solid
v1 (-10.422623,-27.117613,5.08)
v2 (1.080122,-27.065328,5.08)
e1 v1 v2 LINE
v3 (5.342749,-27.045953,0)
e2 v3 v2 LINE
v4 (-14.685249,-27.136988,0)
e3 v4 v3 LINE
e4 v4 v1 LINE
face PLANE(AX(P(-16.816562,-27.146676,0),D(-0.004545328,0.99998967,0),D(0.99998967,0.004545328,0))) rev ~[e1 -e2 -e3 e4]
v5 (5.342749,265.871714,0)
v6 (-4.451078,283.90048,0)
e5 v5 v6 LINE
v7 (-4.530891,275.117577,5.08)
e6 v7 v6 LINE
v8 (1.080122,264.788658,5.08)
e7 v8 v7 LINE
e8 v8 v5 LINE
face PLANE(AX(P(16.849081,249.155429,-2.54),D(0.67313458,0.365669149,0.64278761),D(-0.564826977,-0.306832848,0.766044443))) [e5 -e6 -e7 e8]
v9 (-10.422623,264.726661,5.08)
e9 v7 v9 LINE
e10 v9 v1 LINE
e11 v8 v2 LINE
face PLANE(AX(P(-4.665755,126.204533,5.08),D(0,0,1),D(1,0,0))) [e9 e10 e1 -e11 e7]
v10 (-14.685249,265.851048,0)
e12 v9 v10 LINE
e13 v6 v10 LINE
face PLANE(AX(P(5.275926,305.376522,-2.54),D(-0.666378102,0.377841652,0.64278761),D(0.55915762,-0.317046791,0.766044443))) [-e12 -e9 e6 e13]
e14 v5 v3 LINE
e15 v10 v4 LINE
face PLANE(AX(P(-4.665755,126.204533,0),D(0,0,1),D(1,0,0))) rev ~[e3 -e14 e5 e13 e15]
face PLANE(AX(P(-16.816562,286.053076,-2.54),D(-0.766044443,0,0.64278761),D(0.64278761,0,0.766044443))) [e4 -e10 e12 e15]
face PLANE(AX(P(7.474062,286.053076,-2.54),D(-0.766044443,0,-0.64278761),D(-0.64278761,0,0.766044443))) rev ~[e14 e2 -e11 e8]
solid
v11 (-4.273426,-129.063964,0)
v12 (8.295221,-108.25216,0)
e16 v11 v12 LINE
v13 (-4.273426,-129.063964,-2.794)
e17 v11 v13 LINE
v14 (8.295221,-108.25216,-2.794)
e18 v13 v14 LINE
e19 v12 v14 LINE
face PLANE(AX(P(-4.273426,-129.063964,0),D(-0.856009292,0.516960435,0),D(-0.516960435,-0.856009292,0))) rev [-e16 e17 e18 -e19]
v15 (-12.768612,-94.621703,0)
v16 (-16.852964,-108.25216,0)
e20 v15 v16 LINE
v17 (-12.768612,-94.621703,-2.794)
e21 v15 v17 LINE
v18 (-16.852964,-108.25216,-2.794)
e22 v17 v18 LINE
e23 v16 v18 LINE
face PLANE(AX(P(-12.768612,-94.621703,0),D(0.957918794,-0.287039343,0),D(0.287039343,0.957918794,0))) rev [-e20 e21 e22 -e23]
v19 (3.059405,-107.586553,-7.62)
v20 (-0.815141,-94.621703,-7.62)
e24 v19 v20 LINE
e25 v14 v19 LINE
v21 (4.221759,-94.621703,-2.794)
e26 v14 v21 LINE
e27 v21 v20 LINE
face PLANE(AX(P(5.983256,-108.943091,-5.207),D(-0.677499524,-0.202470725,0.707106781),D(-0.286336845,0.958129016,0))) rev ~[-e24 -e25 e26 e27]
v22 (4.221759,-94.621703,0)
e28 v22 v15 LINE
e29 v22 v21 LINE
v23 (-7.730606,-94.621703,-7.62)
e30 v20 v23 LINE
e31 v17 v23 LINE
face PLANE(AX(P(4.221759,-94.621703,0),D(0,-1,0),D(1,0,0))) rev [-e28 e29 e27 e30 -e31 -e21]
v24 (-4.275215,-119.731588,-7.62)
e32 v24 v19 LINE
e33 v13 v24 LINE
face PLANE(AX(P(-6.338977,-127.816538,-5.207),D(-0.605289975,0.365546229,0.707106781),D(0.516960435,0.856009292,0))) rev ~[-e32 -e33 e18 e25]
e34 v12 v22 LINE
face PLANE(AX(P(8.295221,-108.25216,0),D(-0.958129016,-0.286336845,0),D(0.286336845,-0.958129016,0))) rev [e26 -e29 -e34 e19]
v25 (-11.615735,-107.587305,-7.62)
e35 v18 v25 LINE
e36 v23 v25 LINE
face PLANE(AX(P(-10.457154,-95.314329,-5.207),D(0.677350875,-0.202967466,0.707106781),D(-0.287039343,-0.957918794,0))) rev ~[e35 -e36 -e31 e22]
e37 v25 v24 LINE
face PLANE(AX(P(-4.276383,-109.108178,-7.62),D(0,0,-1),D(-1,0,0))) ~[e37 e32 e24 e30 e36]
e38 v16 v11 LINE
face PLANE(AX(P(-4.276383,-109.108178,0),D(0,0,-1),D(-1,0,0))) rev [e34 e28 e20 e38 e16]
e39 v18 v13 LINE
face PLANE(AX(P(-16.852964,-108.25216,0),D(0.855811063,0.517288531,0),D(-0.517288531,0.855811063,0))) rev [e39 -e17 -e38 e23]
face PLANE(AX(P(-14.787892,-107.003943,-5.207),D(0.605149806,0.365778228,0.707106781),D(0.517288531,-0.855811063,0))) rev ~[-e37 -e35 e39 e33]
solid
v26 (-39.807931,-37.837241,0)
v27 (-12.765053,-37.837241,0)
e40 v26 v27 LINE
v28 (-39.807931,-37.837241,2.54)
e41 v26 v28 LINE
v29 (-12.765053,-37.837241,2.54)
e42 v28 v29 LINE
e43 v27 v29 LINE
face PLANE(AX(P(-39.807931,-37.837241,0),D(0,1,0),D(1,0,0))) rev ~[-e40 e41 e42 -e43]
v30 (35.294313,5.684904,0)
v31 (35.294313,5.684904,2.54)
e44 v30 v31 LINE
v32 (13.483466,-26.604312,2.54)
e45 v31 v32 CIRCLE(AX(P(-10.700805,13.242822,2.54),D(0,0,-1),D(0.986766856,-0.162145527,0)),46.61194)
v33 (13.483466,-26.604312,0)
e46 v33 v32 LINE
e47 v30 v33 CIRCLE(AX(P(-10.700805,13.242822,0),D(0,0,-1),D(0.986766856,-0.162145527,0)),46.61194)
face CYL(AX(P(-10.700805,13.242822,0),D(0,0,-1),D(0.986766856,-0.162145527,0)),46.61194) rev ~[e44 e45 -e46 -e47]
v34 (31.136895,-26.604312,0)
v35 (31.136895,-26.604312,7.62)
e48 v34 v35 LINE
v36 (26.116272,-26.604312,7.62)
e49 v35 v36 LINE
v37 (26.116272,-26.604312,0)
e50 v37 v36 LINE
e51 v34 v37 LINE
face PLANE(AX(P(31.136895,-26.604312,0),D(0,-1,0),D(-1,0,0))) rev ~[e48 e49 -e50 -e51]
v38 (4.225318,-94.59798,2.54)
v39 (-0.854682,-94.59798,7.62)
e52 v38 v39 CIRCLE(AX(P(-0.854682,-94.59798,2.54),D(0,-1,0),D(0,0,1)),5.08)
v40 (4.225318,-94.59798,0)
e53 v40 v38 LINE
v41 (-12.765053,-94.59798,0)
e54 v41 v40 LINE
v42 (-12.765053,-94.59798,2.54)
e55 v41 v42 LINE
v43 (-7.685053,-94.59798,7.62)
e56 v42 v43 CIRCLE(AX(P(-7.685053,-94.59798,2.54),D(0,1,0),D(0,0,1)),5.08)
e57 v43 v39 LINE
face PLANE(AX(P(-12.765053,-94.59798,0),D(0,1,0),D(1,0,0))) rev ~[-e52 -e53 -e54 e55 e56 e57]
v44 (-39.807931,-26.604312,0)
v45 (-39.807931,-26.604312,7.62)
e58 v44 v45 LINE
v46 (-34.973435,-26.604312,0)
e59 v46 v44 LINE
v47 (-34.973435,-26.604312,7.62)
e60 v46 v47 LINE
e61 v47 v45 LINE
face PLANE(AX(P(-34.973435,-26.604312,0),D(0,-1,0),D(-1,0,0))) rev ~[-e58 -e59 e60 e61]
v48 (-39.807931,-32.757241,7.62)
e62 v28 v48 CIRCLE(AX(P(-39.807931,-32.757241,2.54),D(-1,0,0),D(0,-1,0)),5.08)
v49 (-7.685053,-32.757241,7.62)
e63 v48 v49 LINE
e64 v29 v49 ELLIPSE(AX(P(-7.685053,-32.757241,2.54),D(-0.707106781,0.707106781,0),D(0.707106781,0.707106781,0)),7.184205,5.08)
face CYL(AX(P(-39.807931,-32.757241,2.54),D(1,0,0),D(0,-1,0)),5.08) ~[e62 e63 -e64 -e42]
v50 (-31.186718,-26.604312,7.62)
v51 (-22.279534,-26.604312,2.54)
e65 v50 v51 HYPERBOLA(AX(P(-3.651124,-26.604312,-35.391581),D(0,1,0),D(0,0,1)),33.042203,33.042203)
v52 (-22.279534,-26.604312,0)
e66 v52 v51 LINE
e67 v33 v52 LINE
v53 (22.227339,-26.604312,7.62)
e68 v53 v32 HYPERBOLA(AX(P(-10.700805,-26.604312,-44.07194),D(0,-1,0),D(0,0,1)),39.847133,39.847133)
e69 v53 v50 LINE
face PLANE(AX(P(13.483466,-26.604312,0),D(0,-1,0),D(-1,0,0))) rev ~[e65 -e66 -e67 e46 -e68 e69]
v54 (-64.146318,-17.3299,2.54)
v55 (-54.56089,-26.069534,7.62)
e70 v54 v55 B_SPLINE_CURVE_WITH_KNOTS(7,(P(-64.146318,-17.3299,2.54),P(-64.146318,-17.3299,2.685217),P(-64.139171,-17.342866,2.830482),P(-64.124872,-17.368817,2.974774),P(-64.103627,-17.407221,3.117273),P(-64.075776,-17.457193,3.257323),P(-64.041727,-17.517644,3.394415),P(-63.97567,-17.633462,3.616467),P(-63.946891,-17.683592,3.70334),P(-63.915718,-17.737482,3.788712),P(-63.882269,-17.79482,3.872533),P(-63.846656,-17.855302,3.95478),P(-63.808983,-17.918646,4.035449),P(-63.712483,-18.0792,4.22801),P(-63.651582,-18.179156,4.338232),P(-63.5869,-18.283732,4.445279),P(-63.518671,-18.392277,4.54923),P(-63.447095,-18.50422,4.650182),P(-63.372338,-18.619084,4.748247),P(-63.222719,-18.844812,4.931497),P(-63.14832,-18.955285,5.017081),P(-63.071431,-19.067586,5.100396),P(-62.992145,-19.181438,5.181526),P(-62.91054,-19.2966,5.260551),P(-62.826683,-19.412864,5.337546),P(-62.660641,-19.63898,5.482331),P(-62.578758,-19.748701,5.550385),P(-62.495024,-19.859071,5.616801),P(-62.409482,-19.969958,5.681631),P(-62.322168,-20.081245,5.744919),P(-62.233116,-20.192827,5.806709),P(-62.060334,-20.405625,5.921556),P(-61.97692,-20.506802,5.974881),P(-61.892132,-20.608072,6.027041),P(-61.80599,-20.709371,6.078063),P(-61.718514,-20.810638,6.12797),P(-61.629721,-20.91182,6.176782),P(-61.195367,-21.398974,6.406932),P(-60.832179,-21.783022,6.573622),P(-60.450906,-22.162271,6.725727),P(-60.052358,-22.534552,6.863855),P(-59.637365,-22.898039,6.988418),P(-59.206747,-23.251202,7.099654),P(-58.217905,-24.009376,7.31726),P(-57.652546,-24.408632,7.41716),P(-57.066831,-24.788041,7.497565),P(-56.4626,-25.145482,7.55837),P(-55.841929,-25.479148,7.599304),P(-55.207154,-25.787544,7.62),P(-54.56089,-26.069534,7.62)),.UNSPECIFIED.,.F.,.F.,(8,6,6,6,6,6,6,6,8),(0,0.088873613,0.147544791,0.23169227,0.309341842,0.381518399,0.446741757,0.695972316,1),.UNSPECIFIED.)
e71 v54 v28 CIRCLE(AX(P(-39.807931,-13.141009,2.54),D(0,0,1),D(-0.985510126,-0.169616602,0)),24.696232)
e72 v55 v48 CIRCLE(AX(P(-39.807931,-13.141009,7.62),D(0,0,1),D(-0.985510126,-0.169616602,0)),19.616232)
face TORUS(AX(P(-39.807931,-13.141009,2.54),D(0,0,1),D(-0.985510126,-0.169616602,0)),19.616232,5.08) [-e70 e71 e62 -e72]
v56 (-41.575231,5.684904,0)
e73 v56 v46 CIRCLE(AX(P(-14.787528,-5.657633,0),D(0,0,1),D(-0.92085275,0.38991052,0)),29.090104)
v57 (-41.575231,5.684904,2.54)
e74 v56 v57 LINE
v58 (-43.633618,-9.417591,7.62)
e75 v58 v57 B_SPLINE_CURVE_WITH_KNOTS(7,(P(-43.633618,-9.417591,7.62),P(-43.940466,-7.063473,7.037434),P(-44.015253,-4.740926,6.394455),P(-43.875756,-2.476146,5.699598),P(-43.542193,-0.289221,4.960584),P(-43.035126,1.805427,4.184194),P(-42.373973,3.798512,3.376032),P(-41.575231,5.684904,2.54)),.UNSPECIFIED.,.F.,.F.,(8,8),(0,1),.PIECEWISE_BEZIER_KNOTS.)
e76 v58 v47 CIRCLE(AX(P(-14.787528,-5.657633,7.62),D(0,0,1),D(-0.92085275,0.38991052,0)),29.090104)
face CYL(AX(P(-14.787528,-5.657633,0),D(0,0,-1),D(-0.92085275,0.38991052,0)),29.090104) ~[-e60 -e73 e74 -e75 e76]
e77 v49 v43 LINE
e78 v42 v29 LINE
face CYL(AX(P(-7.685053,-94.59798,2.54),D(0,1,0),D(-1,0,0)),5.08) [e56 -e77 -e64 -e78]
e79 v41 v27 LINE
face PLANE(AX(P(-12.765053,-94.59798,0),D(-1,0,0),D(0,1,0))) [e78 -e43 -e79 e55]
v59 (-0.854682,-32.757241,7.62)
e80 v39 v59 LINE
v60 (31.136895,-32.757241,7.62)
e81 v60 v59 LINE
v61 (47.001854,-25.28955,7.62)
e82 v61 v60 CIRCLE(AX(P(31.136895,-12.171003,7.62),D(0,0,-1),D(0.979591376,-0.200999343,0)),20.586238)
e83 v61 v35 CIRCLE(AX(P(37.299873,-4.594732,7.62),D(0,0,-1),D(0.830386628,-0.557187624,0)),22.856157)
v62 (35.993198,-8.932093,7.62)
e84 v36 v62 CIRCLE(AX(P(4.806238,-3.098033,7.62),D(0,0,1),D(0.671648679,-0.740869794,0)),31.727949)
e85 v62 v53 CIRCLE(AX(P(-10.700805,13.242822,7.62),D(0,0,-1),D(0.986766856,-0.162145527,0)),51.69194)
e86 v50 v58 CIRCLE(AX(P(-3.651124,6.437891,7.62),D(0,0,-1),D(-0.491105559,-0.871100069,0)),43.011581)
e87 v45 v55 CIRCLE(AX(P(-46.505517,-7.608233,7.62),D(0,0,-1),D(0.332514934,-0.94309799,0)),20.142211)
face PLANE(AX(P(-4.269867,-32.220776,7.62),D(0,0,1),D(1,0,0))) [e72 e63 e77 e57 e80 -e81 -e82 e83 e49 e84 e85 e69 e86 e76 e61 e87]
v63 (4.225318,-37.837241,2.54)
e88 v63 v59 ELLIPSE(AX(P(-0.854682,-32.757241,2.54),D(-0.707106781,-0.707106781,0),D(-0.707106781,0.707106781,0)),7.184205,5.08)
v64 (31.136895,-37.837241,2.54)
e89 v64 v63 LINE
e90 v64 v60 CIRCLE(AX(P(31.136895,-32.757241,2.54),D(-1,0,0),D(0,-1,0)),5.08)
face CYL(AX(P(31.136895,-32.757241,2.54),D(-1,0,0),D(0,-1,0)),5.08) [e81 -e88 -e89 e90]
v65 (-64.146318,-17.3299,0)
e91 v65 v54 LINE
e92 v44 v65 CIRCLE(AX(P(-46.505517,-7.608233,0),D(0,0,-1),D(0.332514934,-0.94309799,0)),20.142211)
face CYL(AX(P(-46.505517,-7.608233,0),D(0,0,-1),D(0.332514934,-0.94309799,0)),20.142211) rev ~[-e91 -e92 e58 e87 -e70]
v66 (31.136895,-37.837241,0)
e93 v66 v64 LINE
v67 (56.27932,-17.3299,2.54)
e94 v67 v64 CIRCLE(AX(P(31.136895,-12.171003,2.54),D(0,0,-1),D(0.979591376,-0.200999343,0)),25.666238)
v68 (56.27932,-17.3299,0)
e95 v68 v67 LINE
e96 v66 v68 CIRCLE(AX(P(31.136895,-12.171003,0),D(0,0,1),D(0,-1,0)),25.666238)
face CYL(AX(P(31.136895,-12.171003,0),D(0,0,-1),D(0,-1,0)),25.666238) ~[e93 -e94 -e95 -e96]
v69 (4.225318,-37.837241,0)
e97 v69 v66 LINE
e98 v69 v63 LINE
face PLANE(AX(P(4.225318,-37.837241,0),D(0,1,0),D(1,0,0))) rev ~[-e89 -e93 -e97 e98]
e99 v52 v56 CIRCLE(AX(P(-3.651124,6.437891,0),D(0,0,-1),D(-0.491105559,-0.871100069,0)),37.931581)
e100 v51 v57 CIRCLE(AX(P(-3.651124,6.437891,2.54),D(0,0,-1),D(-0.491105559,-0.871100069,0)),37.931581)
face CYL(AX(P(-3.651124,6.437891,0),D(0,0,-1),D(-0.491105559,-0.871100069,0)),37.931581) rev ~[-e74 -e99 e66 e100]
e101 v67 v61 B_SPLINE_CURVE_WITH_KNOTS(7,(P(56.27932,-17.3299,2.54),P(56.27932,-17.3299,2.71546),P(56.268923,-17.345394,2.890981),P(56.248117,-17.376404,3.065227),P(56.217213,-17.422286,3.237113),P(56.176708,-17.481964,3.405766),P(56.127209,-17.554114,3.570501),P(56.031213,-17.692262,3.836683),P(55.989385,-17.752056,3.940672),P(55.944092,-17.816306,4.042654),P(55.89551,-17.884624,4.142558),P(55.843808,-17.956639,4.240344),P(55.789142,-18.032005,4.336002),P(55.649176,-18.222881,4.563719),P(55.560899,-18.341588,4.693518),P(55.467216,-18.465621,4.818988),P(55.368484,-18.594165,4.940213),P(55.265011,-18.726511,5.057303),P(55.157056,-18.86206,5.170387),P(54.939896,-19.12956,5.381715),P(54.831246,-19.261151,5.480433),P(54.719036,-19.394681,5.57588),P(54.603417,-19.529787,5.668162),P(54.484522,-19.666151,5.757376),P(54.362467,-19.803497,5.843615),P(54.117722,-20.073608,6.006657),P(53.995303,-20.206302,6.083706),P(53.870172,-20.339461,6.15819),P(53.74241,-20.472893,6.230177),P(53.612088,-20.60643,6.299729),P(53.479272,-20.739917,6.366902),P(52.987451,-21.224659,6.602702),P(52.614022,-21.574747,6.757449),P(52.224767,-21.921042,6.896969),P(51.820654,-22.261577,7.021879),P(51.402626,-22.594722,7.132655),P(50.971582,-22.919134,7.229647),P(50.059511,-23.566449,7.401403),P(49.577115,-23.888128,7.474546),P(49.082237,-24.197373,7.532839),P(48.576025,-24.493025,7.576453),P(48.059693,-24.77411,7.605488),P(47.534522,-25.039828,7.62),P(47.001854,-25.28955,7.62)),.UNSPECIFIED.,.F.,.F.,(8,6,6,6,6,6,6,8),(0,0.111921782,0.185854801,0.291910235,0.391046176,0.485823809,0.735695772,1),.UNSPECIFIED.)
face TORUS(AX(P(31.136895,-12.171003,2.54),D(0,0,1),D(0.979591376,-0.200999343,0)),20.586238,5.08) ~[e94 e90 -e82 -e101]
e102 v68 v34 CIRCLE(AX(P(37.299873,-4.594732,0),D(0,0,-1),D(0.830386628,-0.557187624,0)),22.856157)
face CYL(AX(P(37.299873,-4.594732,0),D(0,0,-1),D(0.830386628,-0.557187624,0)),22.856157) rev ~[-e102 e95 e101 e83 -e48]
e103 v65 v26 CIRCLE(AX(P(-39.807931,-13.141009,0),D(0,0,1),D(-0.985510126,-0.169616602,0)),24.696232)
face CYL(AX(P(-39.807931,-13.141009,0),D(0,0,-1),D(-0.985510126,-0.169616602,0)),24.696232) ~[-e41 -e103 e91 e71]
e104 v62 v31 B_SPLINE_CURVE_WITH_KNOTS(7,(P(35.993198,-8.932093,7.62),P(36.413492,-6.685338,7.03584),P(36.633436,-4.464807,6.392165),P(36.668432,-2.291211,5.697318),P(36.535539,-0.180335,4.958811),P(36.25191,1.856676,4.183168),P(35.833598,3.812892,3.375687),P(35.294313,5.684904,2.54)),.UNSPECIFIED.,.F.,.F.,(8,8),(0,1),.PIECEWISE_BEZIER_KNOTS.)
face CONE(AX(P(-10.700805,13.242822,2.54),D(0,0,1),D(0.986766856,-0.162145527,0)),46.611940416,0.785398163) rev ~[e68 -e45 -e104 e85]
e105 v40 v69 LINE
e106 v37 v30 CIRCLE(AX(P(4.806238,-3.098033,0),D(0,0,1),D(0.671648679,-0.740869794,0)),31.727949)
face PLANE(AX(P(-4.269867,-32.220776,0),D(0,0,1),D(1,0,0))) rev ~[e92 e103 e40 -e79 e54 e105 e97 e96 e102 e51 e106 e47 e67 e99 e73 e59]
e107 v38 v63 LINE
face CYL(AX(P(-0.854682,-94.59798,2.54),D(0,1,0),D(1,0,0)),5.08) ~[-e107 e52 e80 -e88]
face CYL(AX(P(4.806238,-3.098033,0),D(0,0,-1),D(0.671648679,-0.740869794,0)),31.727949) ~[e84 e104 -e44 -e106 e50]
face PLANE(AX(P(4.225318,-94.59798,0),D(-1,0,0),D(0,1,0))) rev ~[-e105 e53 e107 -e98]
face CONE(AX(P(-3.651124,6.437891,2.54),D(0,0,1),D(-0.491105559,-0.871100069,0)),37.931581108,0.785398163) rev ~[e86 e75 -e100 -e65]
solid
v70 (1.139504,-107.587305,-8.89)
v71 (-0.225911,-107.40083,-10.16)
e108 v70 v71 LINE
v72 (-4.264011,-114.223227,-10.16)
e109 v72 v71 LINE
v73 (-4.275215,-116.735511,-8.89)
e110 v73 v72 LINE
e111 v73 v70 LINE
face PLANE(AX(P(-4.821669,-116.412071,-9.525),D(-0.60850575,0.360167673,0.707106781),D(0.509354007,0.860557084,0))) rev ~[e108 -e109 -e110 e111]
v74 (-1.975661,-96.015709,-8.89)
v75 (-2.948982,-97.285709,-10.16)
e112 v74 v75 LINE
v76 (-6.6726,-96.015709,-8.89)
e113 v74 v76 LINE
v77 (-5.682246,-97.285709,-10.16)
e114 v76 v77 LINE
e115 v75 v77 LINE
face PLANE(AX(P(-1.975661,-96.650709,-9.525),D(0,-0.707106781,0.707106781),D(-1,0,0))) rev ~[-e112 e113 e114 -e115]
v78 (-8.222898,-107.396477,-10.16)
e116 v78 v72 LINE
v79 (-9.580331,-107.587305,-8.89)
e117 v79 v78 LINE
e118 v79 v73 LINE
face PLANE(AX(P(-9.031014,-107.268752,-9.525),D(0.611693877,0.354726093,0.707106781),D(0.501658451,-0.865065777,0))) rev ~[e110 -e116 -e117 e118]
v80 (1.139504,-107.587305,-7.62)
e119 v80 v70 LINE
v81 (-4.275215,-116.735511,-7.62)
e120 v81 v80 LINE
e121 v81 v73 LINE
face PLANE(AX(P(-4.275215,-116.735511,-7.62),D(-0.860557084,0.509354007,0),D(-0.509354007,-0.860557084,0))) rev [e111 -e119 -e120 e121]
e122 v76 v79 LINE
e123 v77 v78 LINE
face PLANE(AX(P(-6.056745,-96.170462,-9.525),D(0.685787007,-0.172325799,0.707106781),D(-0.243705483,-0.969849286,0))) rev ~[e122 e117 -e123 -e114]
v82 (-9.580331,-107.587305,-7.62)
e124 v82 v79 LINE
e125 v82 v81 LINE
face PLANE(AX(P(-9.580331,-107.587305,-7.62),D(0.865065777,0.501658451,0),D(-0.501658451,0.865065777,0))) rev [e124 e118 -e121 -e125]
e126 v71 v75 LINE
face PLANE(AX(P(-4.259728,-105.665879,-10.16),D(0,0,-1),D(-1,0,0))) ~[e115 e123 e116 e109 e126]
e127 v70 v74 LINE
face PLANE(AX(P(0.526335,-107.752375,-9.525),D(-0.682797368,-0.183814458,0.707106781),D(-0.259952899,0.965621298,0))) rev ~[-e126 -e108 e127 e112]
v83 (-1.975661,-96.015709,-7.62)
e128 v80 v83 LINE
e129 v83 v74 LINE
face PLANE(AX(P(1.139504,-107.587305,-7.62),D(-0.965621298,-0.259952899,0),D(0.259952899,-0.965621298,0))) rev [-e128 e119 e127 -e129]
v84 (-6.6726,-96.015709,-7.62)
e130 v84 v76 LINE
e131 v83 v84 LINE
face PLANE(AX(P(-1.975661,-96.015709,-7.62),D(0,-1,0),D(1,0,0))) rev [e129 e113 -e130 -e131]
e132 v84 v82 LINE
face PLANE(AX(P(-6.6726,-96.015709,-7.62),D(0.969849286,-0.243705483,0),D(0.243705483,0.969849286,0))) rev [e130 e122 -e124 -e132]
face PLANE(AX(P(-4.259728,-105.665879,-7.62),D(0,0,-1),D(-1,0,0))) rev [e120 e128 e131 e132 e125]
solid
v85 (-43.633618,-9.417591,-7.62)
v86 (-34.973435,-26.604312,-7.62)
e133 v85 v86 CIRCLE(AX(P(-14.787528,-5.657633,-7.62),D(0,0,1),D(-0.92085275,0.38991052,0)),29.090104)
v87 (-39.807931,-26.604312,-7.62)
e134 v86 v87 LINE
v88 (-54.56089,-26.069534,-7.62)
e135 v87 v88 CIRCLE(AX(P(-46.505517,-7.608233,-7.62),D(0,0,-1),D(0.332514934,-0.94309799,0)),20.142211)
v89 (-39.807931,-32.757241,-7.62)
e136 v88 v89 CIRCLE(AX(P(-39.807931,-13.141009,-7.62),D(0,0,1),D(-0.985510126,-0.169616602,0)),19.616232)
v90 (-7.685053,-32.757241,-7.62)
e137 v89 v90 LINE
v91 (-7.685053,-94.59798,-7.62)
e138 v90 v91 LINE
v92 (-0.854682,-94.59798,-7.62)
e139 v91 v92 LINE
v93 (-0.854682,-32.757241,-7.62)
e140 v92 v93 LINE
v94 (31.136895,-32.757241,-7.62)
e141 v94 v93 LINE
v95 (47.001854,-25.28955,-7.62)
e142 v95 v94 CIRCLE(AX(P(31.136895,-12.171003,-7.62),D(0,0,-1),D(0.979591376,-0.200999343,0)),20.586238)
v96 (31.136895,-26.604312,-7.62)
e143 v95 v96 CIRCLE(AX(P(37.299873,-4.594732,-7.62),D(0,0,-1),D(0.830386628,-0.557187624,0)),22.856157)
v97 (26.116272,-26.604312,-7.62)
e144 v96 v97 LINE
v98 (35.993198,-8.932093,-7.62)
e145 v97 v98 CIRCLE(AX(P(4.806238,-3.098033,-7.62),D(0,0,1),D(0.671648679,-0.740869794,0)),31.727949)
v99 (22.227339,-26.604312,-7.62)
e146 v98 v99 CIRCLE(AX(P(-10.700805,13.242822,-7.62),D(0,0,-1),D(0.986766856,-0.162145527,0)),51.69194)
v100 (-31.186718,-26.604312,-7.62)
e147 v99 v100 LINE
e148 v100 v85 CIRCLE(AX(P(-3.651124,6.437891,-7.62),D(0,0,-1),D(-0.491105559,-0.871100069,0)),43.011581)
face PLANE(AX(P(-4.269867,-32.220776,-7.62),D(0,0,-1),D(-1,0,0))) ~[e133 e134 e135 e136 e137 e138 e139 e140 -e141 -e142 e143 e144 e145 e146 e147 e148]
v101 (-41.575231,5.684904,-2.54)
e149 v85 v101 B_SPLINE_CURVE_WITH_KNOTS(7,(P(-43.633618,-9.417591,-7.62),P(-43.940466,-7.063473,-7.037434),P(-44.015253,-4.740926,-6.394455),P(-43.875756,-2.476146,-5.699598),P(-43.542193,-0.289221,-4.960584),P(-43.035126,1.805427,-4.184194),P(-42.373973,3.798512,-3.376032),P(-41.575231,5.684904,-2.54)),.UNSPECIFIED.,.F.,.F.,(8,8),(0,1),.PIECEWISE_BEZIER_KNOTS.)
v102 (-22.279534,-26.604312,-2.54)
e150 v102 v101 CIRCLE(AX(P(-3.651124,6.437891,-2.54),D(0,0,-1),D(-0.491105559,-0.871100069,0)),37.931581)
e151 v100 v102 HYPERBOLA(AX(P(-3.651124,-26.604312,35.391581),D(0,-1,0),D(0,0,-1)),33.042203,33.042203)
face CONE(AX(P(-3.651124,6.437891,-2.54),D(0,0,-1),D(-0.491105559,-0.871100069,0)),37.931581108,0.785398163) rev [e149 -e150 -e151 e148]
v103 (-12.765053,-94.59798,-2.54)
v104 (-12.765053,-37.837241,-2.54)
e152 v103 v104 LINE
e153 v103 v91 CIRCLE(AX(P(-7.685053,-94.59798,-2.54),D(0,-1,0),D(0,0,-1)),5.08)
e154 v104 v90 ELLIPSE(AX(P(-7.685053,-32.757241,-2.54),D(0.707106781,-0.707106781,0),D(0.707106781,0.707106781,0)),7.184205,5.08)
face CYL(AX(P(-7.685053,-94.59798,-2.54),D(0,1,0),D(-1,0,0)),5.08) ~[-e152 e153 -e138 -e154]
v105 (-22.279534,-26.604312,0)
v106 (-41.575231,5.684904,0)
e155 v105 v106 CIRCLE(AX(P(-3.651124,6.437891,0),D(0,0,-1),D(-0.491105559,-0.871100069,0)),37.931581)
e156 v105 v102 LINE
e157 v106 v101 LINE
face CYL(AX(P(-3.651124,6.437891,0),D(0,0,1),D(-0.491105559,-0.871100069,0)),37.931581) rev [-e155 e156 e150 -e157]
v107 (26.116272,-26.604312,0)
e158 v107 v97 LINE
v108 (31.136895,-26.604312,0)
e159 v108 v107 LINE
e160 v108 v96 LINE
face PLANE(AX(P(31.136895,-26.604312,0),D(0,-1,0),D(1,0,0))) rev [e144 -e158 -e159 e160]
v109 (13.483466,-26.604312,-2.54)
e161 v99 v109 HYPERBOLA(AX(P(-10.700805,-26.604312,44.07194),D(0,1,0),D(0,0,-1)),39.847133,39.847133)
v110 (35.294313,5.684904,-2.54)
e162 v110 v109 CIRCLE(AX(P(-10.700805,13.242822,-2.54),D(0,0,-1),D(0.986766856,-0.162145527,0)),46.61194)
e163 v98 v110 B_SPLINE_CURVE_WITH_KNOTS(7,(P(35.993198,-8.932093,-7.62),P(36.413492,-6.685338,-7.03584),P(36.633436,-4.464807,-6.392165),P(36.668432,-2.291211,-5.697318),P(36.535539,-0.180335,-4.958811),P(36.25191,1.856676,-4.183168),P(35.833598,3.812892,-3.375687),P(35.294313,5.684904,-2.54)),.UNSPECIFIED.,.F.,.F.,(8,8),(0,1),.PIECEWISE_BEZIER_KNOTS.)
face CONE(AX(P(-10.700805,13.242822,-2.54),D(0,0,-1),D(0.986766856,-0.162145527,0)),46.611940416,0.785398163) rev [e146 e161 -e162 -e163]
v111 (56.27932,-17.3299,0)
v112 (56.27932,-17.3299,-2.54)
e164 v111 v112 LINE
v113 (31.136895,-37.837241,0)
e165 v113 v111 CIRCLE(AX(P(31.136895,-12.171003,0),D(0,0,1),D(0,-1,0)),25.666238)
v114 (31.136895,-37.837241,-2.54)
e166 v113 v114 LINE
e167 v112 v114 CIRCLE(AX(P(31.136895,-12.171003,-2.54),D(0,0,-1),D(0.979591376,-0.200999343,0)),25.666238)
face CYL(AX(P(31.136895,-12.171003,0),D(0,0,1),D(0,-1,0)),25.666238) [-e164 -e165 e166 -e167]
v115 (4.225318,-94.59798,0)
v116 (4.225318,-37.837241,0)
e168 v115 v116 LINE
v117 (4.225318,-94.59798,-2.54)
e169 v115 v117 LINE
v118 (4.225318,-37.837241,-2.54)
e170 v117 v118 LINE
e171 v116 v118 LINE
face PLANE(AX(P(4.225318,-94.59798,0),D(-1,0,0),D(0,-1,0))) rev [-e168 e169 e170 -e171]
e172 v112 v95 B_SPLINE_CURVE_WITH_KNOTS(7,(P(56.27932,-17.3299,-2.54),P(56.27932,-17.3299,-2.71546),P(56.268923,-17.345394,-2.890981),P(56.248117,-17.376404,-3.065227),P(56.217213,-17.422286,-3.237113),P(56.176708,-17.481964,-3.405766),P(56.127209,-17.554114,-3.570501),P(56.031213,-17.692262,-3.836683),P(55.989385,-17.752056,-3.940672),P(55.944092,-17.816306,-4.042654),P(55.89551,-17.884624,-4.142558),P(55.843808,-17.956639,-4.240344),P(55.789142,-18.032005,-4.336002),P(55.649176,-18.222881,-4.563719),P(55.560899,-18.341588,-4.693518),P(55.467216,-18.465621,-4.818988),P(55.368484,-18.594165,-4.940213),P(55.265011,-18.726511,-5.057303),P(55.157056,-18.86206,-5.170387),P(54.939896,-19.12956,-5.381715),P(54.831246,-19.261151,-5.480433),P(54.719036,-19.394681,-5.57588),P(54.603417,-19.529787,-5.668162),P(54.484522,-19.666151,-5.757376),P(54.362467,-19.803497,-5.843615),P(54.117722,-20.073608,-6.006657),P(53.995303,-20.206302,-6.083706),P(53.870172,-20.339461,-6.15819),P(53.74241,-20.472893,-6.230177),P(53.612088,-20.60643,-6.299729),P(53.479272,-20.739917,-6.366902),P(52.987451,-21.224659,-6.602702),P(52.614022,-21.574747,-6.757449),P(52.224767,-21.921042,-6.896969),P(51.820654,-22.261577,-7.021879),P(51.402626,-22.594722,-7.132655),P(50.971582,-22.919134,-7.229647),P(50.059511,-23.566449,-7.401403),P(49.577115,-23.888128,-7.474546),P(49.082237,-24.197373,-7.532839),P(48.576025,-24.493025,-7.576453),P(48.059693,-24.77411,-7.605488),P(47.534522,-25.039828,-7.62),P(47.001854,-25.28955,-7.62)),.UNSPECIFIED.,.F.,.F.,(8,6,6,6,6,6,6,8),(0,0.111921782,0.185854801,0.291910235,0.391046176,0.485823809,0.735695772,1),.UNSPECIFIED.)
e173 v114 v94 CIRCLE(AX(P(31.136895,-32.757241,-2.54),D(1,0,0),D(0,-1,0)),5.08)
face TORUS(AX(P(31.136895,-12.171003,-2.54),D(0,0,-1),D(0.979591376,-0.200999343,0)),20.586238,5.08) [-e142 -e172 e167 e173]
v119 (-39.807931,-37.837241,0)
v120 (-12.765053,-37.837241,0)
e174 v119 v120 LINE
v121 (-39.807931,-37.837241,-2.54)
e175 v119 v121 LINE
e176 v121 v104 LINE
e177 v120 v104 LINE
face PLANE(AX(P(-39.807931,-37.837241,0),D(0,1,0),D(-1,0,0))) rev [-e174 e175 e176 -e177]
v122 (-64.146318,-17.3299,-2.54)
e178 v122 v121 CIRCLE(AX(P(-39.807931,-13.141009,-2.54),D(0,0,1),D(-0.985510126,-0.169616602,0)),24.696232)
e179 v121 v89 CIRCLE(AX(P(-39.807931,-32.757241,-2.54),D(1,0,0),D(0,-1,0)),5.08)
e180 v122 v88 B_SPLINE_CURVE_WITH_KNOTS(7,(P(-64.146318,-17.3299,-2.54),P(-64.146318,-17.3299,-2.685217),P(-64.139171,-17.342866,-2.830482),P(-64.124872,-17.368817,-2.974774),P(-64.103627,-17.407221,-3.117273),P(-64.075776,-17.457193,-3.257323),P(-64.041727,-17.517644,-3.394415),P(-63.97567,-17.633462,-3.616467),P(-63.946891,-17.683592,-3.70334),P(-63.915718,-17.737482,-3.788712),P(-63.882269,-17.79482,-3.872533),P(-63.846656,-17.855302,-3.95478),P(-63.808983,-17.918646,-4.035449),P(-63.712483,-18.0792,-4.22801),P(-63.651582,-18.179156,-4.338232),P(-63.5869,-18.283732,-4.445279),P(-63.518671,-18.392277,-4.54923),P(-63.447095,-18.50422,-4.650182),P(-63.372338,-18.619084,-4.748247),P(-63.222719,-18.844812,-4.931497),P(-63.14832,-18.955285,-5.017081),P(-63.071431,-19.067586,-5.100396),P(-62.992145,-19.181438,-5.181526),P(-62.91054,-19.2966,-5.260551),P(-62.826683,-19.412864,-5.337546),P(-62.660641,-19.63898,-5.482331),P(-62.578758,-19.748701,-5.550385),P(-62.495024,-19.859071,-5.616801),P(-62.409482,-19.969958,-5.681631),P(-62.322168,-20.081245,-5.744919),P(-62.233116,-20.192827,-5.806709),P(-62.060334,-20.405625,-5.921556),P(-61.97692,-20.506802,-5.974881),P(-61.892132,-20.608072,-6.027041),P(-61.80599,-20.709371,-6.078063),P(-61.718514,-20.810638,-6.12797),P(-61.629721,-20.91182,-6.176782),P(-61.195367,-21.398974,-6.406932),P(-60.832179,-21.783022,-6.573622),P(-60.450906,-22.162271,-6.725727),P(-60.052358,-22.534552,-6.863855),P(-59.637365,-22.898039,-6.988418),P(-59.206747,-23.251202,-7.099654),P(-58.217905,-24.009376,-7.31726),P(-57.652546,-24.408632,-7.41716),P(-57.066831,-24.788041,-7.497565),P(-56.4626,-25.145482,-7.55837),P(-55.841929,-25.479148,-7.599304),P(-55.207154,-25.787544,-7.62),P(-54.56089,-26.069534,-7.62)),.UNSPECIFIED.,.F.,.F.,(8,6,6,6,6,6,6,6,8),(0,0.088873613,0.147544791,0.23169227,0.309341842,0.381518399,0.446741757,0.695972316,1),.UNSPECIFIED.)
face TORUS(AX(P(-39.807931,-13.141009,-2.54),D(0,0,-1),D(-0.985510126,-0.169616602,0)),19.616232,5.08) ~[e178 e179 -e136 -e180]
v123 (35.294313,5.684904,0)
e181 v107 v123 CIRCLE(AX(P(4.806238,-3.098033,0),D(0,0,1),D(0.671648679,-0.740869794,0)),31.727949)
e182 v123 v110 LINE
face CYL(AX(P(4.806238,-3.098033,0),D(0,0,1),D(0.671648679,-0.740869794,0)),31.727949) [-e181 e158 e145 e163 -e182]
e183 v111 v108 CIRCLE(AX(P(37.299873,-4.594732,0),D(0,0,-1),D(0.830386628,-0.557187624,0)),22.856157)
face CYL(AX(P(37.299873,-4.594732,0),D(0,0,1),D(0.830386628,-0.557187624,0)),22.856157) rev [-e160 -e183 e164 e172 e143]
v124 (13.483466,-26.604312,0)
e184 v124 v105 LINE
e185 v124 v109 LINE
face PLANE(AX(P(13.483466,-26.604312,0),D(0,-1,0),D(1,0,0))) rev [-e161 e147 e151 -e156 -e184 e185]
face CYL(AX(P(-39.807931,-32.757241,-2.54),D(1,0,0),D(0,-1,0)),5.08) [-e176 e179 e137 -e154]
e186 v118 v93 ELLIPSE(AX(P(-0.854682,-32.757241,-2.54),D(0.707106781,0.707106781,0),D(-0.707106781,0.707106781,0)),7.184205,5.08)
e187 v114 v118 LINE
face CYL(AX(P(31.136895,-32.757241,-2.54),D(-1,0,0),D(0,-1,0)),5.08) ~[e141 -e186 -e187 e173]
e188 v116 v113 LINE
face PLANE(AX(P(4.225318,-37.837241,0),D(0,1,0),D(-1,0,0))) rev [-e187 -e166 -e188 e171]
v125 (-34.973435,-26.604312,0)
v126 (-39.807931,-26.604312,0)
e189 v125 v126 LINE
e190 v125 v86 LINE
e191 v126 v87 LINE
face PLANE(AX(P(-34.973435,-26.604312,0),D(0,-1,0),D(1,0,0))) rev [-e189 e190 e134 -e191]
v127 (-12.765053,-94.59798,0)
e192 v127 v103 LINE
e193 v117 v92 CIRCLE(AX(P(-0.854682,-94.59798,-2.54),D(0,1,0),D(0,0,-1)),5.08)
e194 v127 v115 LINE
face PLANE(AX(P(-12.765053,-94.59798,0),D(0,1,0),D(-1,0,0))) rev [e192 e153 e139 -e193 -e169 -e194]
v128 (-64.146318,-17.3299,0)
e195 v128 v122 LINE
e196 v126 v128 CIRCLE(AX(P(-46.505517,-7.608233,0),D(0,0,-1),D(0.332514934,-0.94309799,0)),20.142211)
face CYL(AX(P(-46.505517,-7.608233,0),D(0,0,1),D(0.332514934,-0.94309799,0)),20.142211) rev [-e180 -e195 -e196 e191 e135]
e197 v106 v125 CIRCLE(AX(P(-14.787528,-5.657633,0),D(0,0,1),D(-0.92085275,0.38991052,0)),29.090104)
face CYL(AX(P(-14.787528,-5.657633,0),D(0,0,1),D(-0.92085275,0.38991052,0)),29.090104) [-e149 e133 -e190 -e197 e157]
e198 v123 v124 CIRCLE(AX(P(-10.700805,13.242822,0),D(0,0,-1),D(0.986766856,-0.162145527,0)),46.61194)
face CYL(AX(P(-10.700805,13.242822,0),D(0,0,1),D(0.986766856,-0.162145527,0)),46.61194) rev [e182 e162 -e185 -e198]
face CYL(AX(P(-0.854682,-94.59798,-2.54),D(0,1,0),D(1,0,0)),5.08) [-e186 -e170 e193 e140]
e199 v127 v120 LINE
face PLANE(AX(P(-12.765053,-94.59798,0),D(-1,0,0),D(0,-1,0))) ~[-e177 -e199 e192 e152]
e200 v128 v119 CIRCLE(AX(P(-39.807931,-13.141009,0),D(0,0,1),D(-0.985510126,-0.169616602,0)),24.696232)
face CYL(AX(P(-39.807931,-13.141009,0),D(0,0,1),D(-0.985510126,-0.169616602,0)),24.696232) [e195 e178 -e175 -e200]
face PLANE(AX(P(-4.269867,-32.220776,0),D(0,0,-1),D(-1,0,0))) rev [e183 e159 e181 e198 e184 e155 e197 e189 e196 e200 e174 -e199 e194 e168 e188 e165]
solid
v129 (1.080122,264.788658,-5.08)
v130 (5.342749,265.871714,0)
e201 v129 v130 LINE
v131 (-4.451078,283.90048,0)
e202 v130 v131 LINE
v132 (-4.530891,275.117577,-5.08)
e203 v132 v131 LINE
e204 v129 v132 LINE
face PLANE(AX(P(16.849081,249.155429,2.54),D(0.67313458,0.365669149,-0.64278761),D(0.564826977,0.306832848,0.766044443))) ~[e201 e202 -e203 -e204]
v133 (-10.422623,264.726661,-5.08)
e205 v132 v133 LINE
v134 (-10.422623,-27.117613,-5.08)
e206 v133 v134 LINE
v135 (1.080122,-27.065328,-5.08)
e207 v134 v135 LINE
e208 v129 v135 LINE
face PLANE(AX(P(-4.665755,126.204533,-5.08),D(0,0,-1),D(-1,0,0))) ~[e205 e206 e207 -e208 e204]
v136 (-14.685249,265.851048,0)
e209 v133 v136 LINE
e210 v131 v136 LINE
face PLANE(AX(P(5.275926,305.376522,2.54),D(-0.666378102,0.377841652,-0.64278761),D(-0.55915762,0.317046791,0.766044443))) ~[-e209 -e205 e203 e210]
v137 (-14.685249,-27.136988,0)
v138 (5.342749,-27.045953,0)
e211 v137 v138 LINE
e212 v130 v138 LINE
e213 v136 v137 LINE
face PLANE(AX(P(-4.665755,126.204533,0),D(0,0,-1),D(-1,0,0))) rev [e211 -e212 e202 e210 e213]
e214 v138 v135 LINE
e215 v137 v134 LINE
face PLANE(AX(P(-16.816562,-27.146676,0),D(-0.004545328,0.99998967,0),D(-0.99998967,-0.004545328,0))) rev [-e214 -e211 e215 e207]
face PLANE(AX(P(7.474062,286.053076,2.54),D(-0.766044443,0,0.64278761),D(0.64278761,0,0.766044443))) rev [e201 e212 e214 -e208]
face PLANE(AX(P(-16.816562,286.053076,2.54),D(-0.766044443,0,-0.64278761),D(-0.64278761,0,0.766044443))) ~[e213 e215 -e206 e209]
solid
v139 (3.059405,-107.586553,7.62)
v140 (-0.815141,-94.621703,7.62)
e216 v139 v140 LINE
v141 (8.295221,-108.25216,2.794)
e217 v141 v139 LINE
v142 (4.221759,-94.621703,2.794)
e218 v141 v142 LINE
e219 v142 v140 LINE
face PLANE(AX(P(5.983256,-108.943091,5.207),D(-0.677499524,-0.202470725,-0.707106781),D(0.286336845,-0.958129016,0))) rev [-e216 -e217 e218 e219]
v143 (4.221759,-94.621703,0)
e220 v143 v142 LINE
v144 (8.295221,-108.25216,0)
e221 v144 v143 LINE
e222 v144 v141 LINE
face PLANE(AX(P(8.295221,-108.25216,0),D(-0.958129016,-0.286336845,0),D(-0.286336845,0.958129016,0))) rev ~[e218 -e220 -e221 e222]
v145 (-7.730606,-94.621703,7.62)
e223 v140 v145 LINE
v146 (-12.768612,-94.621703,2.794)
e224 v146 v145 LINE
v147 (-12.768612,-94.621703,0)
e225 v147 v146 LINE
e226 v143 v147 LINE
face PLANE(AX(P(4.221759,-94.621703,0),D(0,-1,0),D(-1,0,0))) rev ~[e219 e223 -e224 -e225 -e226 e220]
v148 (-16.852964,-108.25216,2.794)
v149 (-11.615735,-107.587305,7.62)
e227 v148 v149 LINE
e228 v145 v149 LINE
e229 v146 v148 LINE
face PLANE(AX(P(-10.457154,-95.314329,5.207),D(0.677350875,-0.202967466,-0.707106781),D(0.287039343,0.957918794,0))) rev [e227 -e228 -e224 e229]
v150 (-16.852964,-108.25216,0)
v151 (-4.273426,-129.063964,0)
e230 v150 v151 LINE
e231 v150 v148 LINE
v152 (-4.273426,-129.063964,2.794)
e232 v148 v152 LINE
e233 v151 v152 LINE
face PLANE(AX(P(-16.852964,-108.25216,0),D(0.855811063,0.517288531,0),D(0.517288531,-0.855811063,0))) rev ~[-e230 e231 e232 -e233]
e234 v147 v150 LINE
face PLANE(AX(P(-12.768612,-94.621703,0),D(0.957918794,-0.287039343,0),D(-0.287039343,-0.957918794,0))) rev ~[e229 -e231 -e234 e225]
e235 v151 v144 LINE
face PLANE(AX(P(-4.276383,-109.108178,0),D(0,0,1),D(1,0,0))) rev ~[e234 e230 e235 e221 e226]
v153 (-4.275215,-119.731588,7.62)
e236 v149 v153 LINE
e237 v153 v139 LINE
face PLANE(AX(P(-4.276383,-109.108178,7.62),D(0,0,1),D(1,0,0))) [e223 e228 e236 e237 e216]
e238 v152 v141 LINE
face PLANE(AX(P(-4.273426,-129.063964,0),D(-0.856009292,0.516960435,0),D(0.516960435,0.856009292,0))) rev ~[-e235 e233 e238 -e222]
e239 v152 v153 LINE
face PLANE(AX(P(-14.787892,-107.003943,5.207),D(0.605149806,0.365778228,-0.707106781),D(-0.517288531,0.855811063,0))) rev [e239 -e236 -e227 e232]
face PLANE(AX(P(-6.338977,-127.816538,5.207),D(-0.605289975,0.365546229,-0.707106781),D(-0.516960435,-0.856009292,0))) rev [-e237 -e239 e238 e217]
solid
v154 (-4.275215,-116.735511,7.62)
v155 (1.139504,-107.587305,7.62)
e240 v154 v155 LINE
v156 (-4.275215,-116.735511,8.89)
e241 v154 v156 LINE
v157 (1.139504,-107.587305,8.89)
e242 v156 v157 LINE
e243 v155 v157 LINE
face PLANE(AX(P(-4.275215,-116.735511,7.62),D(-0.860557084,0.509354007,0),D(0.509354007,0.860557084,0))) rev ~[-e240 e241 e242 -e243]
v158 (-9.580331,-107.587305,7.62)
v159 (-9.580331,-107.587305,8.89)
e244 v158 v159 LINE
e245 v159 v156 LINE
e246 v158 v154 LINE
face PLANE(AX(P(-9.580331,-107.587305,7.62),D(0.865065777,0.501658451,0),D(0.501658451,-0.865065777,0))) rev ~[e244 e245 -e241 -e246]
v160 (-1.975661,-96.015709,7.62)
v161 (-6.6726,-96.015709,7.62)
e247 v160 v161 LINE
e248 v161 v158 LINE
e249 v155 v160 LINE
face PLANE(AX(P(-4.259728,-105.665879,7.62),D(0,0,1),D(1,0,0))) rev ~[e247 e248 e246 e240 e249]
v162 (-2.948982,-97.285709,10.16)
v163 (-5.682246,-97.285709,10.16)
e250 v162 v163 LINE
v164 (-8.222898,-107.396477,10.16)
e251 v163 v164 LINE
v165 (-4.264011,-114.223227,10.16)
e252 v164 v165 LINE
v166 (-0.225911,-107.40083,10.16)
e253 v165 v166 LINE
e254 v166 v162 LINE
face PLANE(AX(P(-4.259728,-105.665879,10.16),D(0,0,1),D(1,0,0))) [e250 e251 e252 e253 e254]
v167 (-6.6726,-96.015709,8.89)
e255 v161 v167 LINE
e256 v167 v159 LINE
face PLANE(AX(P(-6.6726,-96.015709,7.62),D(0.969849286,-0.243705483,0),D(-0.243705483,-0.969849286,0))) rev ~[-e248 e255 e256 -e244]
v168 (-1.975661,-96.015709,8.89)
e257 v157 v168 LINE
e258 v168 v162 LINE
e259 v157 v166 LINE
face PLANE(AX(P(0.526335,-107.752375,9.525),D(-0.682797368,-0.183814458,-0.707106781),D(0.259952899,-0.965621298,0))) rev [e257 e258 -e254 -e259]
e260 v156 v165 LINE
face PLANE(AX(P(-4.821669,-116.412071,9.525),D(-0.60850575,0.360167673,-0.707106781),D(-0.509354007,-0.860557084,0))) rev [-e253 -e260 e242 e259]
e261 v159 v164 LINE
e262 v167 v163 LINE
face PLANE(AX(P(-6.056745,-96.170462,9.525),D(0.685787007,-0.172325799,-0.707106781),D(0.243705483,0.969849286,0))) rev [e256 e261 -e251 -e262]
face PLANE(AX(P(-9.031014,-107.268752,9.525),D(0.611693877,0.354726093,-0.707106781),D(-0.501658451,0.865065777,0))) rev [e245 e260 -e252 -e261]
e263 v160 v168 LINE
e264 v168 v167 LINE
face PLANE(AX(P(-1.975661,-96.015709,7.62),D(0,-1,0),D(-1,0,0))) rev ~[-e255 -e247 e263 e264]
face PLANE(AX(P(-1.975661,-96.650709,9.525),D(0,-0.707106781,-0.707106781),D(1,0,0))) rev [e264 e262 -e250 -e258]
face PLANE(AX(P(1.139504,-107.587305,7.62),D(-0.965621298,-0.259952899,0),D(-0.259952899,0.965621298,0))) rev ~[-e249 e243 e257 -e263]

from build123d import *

# Parameters (mm, degrees)
F0_W        = 16.9903710485
F0_H        = 11.2329293042
F0_H_2      = 56.7607395351
F1_DEPTH    = 7.62
F2_R        = 5.08
F4_DEPTH    = 5.08
F5_T1_DEPTH = 332.8395862184
F5_T3_DEPTH = 332.7291762168
F5_T5_DEPTH = 64.4306283308
F5_T7_DEPTH = 64.1781797191
F6_R        = 5.08
F7_SIZE     = 5.08
F9_DEPTH    = 7.62
F10_SIZE    = 4.826
F12_DEPTH   = 2.54
F13_SIZE    = 1.27


# Not quite as in the source:
# - a fillet or chamfer that OpenCascade refuses, or shapes differently, is made with other operations: its cross-section is extruded or revolved along the edge and cut away or added


with BuildPart() as f1:
    # F0 (on Top) → F1 (new body)
    with BuildSketch(Plane.XY):
        with Locations((-4.2698672041, -32.2207761928)):
            Rectangle(F0_W, F0_H)
        Polygon((-12.7650527284, -37.837240845), (-12.7650527284, -26.6043115407), (-22.2795344889, -26.6043115407), (-34.9734351039, -26.6043115407), (-39.8079305887, -26.6043115407), (-39.8079305887, -37.837240845), align=None)
        Polygon((13.4834656492, -26.6043115407), (4.2253183201, -26.6043115407), (4.2253183201, -37.837240845), (31.1368945986, -37.837240845), (31.1368945986, -26.6043115407), (26.1162724346, -26.6043115407), align=None)
        with Locations((-4.2698672041, -66.2176106125)):
            Rectangle(F0_W, F0_H_2)
        with BuildLine():
            Line((-34.9734351039, -26.6043115407), (-22.2795344889, -26.6043115407))
            ThreePointArc((-22.2795344889, -26.6043115407), (-36.2117622733, -13.0200039257), (-41.5752306581, 5.6849042885))
            ThreePointArc((-41.5752306581, 5.6849042885), (-43.2880257194, -11.4847943334), (-34.9734351039, -26.6043115407))
        make_face()
        with BuildLine():
            ThreePointArc((35.2943129838, 5.6849042885), (27.9247695922, -12.8481340326), (13.4834656492, -26.6043115407))
            Line((13.4834656492, -26.6043115407), (26.1162724346, -26.6043115407))
            ThreePointArc((26.1162724346, -26.6043115407), (35.3252385886, -11.7728990546), (35.2943129838, 5.6849042885))
        make_face()
        with BuildLine():
            ThreePointArc((-64.1463175416, -17.3298995942), (-55.7210393724, -32.026898994), (-39.8079305887, -37.837240845))
            Line((-39.8079305887, -37.837240845), (-39.8079305887, -26.6043115407))
            ThreePointArc((-39.8079305887, -26.6043115407), (-53.6778361214, -26.4302012719), (-64.1463175416, -17.3298995942))
        make_face()
        with BuildLine():
            Line((31.1368945986, -26.6043115407), (31.1368945986, -37.837240845))
            ThreePointArc((31.1368945986, -37.837240845), (47.3595070101, -32.0602618252), (56.2793202698, -17.3298995942))
            ThreePointArc((56.2793202698, -17.3298995942), (45.2099392934, -26.038489943), (31.1368945986, -26.6043115407))
        make_face()
    extrude(amount=F1_DEPTH)

    # F2
    f2_edges = [f1.edges().sort_by_distance(p)[0] for p in [
        (-12.765053, -66.217611, 7.62),
        (4.225318, -66.217611, 7.62),
    ]]
    fillet(f2_edges, radius=F2_R)

    # F6
    f6_edges = [f1.edges().sort_by_distance(p)[0] for p in [
        (-26.286492, -37.837241, 7.62),
        (17.681106, -37.837241, 7.62),
        (-55.721039, -32.026899, 7.62),
        (47.359507, -32.060262, 7.62),
    ]]
    fillet(f6_edges, radius=F6_R)

    # F7
    f7_edges = [f1.edges().sort_by_distance(p)[0] for p in [
        (-36.211762, -13.020004, 7.62),
        (27.92477, -12.848134, 7.62),
    ]]
    chamfer(f7_edges, length=F7_SIZE)


with BuildPart() as f4:
    # F3 (on Top) → F4 (new body)
    with BuildSketch(Plane.XY):
        Polygon((-16.8165620416, 266.4132416248), (-16.8165620416, -27.1466755785), (7.4740615673, -27.036265577), (7.4740615673, 266.4132416248), (-4.4111721218, 288.2919311523), align=None)
    extrude(amount=F4_DEPTH)

    # F5: chamfer of 7.62 x 6.3939391896 on 4 edges, made by hand

    # F5_s2 → F5_t1 (cut)
    with BuildSketch(Plane.XZ.offset(-286.0530761323)):
        Polygon((-16.8165620416, -2.54), (-10.4226228521, 5.08), (-16.8165620416, 5.08), align=None)
    extrude(amount=F5_T1_DEPTH, mode=Mode.SUBTRACT)

    # F5_s4 → F5_t3 (cut)
    with BuildSketch(Plane.XZ.offset(-286.0530761323)):
        Polygon((7.4740615673, -2.54), (1.0801223778, 5.08), (7.4740615673, 5.08), align=None)
    extrude(amount=F5_T3_DEPTH, mode=Mode.SUBTRACT)

    # F5_s6 → F5_t5 (cut)
    with BuildSketch(Plane(origin=(132.309777211, 233.3473236835, 0), x_dir=(0, 0, 1), z_dir=(-0.4932372465, -0.869894832, 0))):
        Polygon((-2.54, 146.0335741426), (5.08, 139.6396349531), (5.08, 146.0335741426), align=None)
    extrude(amount=F5_T5_DEPTH, mode=Mode.SUBTRACT)

    # F5_s8 → F5_t7 (cut)
    with BuildSketch(Plane(origin=(-100.6695105648, 185.3154110511, 0), x_dir=(0, 0, 1), z_dir=(-0.4773471727, 0.8787147869, 0))):
        Polygon((-2.54, 133.7391760771), (5.08, 127.3452368875), (5.08, 133.7391760771), align=None)
    extrude(amount=F5_T7_DEPTH, mode=Mode.SUBTRACT)


with BuildPart() as f9:
    # F8 (on Top) → F9 (new body)
    with BuildSketch(Plane.XY):
        Polygon((4.2217592709, -94.6217030287), (-12.7686117776, -94.6217030287), (-16.8529637158, -108.2521602511), (-4.2734262533, -129.0639638901), (8.2952212542, -108.2521602511), align=None)
    extrude(amount=F9_DEPTH)

    # F10
    f10_edges = [f9.edges().sort_by_distance(p)[0] for p in [
        (-10.563195, -118.658062, 7.62),
        (2.010898, -118.658062, 7.62),
        (-14.810788, -101.436932, 7.62),
        (6.25849, -101.436932, 7.62),
    ]]
    chamfer(f10_edges, length=F10_SIZE)


with BuildPart() as f12:
    # F11 (on face) → F12 (new body)
    with BuildSketch(Plane.XY.offset(7.62)):
        Polygon((-4.2752149429, -116.7355105281), (1.1395043943, -107.5873051191), (-1.9756610023, -96.0157086394), (-6.6725995569, -96.0157086394), (-9.5803312475, -107.5873051191), align=None)
    extrude(amount=F12_DEPTH)

    # F13
    f13_edges = [f12.edges().sort_by_distance(p)[0] for p in [
        (-8.126465, -101.801507, 10.16),
        (-4.32413, -96.015709, 10.16),
        (-0.418078, -101.801507, 10.16),
        (-1.567855, -112.161408, 10.16),
        (-6.927773, -112.161408, 10.16),
    ]]
    chamfer(f13_edges, length=F13_SIZE)


with BuildPart() as f14_1:
    # F14: instance of F4
    add(f4.part.mirror(Plane.XY))


with BuildPart() as f14_2:
    # F14: instance of F1
    add(f1.part.mirror(Plane.XY))


with BuildPart() as f14_3:
    # F14: instance of F12
    add(f12.part.mirror(Plane.XY))


with BuildPart() as f14_4:
    # F14: instance of F9
    add(f9.part.mirror(Plane.XY))


solid = Compound([f1.part, f4.part, f9.part, f12.part, f14_1.part, f14_2.part, f14_3.part, f14_4.part])
